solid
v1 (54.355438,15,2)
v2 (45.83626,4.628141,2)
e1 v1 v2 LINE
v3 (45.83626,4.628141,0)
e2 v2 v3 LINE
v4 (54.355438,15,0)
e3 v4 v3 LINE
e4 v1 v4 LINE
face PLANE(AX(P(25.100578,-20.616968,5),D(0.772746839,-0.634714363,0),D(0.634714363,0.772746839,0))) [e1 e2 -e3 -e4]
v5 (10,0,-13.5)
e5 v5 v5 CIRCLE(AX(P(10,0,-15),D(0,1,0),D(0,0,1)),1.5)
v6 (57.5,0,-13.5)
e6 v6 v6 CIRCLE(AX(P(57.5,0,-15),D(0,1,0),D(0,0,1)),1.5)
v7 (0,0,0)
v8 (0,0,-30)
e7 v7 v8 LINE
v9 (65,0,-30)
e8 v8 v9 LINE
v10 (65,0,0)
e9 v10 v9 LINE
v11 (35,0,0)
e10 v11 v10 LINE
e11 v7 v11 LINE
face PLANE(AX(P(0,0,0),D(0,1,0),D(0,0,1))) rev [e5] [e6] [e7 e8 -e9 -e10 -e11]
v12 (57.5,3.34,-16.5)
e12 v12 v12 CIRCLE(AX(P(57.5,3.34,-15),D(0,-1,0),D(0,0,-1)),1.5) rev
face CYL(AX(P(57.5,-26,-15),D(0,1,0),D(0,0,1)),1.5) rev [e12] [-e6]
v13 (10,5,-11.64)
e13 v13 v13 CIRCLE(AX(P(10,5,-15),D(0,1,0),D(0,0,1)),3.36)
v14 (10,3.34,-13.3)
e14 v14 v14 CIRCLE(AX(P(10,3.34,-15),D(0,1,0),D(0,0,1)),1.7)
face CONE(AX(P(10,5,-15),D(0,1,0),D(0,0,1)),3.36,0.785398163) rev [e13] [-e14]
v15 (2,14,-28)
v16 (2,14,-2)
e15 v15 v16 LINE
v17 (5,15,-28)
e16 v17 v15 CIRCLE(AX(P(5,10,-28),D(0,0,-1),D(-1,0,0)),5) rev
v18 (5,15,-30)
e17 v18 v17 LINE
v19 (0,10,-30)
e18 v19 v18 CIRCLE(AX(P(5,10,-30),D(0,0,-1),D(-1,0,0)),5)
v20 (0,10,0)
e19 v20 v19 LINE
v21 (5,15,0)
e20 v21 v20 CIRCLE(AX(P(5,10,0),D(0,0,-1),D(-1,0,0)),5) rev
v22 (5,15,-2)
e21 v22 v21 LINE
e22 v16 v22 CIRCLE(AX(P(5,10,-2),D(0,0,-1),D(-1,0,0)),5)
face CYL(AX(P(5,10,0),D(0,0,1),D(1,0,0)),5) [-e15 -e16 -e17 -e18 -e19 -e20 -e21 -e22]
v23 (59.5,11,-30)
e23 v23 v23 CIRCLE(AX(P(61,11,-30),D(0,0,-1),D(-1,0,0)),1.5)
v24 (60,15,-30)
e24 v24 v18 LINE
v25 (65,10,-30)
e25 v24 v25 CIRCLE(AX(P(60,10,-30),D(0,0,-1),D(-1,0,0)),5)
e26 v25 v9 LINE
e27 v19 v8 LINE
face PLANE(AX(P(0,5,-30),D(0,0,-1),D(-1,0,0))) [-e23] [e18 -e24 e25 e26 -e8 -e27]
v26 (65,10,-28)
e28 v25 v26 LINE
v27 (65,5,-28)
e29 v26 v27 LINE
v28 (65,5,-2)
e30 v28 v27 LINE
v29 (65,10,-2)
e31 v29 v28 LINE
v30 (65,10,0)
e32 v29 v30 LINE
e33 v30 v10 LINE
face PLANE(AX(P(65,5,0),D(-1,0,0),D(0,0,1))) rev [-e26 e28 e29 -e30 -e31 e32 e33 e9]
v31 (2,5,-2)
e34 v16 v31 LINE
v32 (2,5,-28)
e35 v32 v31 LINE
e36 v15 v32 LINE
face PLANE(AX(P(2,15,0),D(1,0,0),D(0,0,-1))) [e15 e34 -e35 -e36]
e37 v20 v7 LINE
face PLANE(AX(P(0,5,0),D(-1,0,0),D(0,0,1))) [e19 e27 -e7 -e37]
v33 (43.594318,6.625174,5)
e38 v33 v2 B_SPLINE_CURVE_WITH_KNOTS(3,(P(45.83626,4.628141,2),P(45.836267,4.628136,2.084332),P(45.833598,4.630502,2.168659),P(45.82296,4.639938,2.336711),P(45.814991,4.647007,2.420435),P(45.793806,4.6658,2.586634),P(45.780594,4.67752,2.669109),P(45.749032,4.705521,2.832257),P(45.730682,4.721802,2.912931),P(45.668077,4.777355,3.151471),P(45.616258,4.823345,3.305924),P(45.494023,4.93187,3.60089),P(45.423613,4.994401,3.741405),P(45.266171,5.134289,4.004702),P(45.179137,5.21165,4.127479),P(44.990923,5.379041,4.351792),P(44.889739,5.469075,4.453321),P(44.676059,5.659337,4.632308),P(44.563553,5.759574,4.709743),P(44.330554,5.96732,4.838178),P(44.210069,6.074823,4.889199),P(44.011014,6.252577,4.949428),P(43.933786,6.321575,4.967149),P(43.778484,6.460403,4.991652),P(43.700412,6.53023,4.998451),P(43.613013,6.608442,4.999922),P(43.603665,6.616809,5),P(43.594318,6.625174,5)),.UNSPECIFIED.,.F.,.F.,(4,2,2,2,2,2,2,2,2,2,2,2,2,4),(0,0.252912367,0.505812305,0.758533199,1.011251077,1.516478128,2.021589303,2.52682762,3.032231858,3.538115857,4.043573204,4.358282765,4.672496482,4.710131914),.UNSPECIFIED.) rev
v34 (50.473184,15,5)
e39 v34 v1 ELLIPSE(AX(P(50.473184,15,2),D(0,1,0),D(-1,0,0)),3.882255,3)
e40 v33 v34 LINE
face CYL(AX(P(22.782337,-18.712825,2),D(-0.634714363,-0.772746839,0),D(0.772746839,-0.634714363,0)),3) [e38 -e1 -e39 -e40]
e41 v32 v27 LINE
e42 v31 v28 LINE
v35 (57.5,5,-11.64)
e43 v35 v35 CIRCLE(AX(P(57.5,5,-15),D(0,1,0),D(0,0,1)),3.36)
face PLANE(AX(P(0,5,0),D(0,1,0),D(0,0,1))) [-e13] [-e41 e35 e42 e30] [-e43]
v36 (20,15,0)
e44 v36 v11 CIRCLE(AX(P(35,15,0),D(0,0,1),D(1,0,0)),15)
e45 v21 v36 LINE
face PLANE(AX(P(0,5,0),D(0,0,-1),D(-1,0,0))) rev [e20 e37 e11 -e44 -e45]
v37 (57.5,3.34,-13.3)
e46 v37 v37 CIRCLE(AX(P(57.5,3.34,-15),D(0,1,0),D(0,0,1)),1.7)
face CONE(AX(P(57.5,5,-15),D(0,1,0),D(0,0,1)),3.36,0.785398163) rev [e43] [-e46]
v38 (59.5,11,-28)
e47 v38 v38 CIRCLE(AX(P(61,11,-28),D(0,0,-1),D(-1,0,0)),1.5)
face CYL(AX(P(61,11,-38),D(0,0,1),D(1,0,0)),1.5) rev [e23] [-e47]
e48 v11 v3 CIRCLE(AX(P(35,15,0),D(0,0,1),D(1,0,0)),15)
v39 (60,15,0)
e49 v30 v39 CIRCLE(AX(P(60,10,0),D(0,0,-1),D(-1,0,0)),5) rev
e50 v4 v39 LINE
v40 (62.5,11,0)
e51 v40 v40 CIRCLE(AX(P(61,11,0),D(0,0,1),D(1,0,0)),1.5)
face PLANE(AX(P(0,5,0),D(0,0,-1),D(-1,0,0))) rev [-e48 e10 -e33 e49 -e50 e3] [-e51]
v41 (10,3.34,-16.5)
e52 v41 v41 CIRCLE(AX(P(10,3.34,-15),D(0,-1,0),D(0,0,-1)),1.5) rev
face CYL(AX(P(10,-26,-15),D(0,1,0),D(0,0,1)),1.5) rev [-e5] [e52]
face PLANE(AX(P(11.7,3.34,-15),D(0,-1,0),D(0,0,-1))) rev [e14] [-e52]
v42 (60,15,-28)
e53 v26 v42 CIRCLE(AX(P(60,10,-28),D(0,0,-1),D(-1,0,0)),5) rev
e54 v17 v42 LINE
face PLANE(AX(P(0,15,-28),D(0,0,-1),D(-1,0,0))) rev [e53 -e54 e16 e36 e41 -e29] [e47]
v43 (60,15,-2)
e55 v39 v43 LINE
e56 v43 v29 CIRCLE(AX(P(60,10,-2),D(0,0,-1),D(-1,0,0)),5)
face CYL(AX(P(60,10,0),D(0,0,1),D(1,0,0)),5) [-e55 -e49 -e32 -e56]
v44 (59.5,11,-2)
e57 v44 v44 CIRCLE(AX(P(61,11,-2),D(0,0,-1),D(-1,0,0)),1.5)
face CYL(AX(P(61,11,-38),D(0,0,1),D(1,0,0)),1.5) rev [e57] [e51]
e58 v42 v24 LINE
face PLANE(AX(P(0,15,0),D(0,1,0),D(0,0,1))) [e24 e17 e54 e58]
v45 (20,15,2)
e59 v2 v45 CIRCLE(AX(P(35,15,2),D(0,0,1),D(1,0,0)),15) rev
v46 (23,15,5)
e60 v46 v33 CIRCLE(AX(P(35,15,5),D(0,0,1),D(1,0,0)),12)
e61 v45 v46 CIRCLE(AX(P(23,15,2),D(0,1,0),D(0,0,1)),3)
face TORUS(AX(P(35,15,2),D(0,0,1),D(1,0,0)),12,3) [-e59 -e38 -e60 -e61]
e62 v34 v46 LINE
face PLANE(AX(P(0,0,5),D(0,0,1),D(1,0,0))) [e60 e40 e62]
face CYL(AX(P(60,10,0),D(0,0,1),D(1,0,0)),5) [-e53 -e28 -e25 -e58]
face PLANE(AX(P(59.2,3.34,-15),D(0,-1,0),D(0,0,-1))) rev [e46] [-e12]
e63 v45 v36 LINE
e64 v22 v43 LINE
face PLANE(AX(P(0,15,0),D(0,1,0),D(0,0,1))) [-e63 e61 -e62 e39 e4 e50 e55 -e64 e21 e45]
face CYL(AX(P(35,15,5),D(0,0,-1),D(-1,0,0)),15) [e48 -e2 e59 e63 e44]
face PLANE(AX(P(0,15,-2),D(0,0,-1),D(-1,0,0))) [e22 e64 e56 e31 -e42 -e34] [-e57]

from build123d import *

# Parameters (mm, degrees)
CROQUIS1_W                   = 65
CROQUIS1_H                   = 30
SALIENTE_EXTRUIR1_DEPTH      = 5
SALIENTE_EXTRUIR2_DEPTH      = 10
REDONDEO1_R                  = 5
CROQUIS3_R                   = 1.5
CORTAR_EXTRUIR1_DEPTH        = 38
CROQUIS4_R                   = 1.5
CORTAR_EXTRUIR2_DEPTH        = 31
TALADROAVANZADO1_OUTLINE_R   = 1.7
TALADROAVANZADO1_DEPTH       = 1.66
TALADROAVANZADO1_DRAFT       = -45
TALADROAVANZADO1_2_OUTLINE_R = 1.7
TALADROAVANZADO1_2_DEPTH     = 1.66
TALADROAVANZADO1_2_DRAFT     = -45
SALIENTE_EXTRUIR3_DEPTH      = 5
REDONDEO2_START              = 19.038575289
REDONDEO2_DEPTH              = 30.635489066
REDONDEO2_2_ANGLE            = 136.254425


with BuildPart() as part:
    # Croquis1 → Saliente-Extruir1 (new body)
    with BuildSketch(Plane(origin=(0, 0, 0), x_dir=(1, 0, 0), z_dir=(0, 1, 0))):
        with Locations((32.5, 15)):
            Rectangle(CROQUIS1_W, CROQUIS1_H)
    extrude(amount=SALIENTE_EXTRUIR1_DEPTH)

    # Croquis2 → Saliente-Extruir2 (add)
    with BuildSketch(Plane(origin=(0, 5, 0), x_dir=(1, 0, 0), z_dir=(0, 1, 0))):
        Polygon((2, 2), (2, 28), (65, 28), (65, 30), (0, 30), (0, 0), (65, 0), (65, 2), align=None)
    extrude(amount=SALIENTE_EXTRUIR2_DEPTH)

    # Redondeo1
    # the kernel refuses this fillet: 5 mm, written as the material it takes off along each edge
    with BuildSketch(Plane(origin=(65, 15, 12.5), x_dir=(0, -1, 0), z_dir=(0, 0, -1)), Plane(origin=(65, 15, -15.5), x_dir=(0, -1, 0), z_dir=(0, 0, -1))) as redondeo1_piece_1:
        with BuildLine():
            CenterArc((REDONDEO1_R, REDONDEO1_R), REDONDEO1_R, 180, 90)
            Line((0, REDONDEO1_R), (0, 0))
            Line((0, 0), (REDONDEO1_R, 0))
        make_face()
    extrude(amount=27, mode=Mode.SUBTRACT)
    with BuildSketch(Plane(origin=(0, 15, -42.5), x_dir=(1, 0, 0), z_dir=(0, 0, 1))) as redondeo1_piece_2:
        with BuildLine():
            CenterArc((REDONDEO1_R, -REDONDEO1_R), REDONDEO1_R, 90, 90)
            Line((0, -REDONDEO1_R), (0, 0))
            Line((0, 0), (REDONDEO1_R, 0))
        make_face()
    extrude(amount=55, mode=Mode.SUBTRACT)

    # Croquis3 → Cortar-Extruir1 (cut)
    with BuildSketch(Plane.XY):
        with Locations(Location((61, 11, 0), (0, 0, 180))):
            Circle(CROQUIS3_R)
    extrude(amount=-CORTAR_EXTRUIR1_DEPTH, mode=Mode.SUBTRACT)

    # Croquis4 → Cortar-Extruir2 (cut)
    with BuildSketch(Plane(origin=(0, 5, 0), x_dir=(1, 0, 0), z_dir=(0, 1, 0))):
        with Locations(Location((57.5, 15, 0), (0, 0, 270))):
            Circle(CROQUIS4_R)
        with Locations(Location((10, 15, 0), (0, 0, 270))):
            Circle(CROQUIS4_R)
    extrude(amount=-CORTAR_EXTRUIR2_DEPTH, mode=Mode.SUBTRACT)


with BuildPart() as taladroavanzado1_tool:
    # TaladroAvanzado1: read off the stored shape, not the designer's step
    # TaladroAvanzado1 outline → TaladroAvanzado1 (with draft: the straight prism first)
    with BuildSketch(Plane(origin=(0, 3.34, 0), x_dir=(1, 0, 0), z_dir=(0, 1, 0))):
        with Locations((57.5, 15)):
            Circle(TALADROAVANZADO1_OUTLINE_R)
        with BuildLine():
            ThreePointArc((57.5, 16.5), (59, 15), (57.5, 13.5))
            ThreePointArc((57.5, 13.5), (56, 15), (57.5, 16.5))
        make_face(mode=Mode.SUBTRACT)
    extrude(amount=TALADROAVANZADO1_DEPTH)
    # TaladroAvanzado1: the draft: its side faces are tilted about the plane it starts from
    taladroavanzado1_sides = [taladroavanzado1_tool.faces().sort_by_distance(p)[0] for p in [
        (55.8, 4.17, -15),
        (57.5, 4.17, -13.5),
    ]]
    draft(taladroavanzado1_sides, Plane(origin=(0, 3.34, 0), x_dir=(1, 0, 0), z_dir=(0, 1, 0)), TALADROAVANZADO1_DRAFT)


with BuildPart() as part_1:
    add(part.part)

    # TaladroAvanzado1: cut by taladroavanzado1_tool
    add(taladroavanzado1_tool.part, mode=Mode.SUBTRACT)


with BuildPart() as taladroavanzado1_2_tool:
    # TaladroAvanzado1 2 outline → TaladroAvanzado1 2 (with draft: the straight prism first)
    with BuildSketch(Plane(origin=(0, 3.34, 0), x_dir=(1, 0, 0), z_dir=(0, 1, 0))):
        with Locations((10, 15)):
            Circle(TALADROAVANZADO1_2_OUTLINE_R)
        with BuildLine():
            ThreePointArc((10, 16.5), (11.5, 15), (10, 13.5))
            ThreePointArc((10, 13.5), (8.5, 15), (10, 16.5))
        make_face(mode=Mode.SUBTRACT)
    extrude(amount=TALADROAVANZADO1_2_DEPTH)
    # TaladroAvanzado1 2: the draft: its side faces are tilted about the plane it starts from
    taladroavanzado1_2_sides = [taladroavanzado1_2_tool.faces().sort_by_distance(p)[0] for p in [
        (8.3, 4.17, -15),
        (10, 4.17, -13.5),
    ]]
    draft(taladroavanzado1_2_sides, Plane(origin=(0, 3.34, 0), x_dir=(1, 0, 0), z_dir=(0, 1, 0)), TALADROAVANZADO1_2_DRAFT)


with BuildPart() as part_2:
    add(part_1.part)

    # TaladroAvanzado1 2: cut by taladroavanzado1_2_tool
    add(taladroavanzado1_2_tool.part, mode=Mode.SUBTRACT)

    # Croquis7 → Saliente-Extruir3 (add)
    with BuildSketch(Plane.XY):
        with BuildLine():
            Line((47.279462763, 6.385199117), (54.355438457, 15))
            Line((54.355438457, 15), (20, 15))
            ThreePointArc((20, 15), (29.411793924, 1.079800546), (45.83626038, 4.62814091))
            Line((45.83626038, 4.62814091), (47.279462763, 6.385199117))
        make_face()
    extrude(amount=SALIENTE_EXTRUIR3_DEPTH)

    # Redondeo2: read off the stored shape, not the designer's step
    # Redondeo2 outline → Redondeo2 (cut)
    with BuildSketch(Plane(origin=(0, 0, 0), x_dir=(0.7727468393506849, -0.6347143627440037, 0), z_dir=(0.6347143627440038, 0.7727468393506848, 0)).offset(REDONDEO2_START)):
        with BuildLine():
            Line((32.482277828, -5), (32.482277828, -2))
            ThreePointArc((32.482277828, -2), (31.603598172, -4.121320344), (29.482277828, -5))
            Line((29.482277828, -5), (32.482277828, -5))
        make_face()
    extrude(amount=REDONDEO2_DEPTH, mode=Mode.SUBTRACT)

    # Redondeo2 2 outline → Redondeo2 2 (revolve, cut)
    with BuildSketch(Plane(origin=(35, 15, 0), x_dir=(-1, 0, 0), z_dir=(0, 1, 0))):
        with BuildLine():
            ThreePointArc((12, 5), (14.121320344, 4.121320344), (15, 2))
            Line((15, 2), (15, 5))
            Line((15, 5), (12, 5))
        make_face()
    revolve(axis=Axis((35, 15, 0), (0, 0, 1)), revolution_arc=REDONDEO2_2_ANGLE, mode=Mode.SUBTRACT)


solid = part_2.part
